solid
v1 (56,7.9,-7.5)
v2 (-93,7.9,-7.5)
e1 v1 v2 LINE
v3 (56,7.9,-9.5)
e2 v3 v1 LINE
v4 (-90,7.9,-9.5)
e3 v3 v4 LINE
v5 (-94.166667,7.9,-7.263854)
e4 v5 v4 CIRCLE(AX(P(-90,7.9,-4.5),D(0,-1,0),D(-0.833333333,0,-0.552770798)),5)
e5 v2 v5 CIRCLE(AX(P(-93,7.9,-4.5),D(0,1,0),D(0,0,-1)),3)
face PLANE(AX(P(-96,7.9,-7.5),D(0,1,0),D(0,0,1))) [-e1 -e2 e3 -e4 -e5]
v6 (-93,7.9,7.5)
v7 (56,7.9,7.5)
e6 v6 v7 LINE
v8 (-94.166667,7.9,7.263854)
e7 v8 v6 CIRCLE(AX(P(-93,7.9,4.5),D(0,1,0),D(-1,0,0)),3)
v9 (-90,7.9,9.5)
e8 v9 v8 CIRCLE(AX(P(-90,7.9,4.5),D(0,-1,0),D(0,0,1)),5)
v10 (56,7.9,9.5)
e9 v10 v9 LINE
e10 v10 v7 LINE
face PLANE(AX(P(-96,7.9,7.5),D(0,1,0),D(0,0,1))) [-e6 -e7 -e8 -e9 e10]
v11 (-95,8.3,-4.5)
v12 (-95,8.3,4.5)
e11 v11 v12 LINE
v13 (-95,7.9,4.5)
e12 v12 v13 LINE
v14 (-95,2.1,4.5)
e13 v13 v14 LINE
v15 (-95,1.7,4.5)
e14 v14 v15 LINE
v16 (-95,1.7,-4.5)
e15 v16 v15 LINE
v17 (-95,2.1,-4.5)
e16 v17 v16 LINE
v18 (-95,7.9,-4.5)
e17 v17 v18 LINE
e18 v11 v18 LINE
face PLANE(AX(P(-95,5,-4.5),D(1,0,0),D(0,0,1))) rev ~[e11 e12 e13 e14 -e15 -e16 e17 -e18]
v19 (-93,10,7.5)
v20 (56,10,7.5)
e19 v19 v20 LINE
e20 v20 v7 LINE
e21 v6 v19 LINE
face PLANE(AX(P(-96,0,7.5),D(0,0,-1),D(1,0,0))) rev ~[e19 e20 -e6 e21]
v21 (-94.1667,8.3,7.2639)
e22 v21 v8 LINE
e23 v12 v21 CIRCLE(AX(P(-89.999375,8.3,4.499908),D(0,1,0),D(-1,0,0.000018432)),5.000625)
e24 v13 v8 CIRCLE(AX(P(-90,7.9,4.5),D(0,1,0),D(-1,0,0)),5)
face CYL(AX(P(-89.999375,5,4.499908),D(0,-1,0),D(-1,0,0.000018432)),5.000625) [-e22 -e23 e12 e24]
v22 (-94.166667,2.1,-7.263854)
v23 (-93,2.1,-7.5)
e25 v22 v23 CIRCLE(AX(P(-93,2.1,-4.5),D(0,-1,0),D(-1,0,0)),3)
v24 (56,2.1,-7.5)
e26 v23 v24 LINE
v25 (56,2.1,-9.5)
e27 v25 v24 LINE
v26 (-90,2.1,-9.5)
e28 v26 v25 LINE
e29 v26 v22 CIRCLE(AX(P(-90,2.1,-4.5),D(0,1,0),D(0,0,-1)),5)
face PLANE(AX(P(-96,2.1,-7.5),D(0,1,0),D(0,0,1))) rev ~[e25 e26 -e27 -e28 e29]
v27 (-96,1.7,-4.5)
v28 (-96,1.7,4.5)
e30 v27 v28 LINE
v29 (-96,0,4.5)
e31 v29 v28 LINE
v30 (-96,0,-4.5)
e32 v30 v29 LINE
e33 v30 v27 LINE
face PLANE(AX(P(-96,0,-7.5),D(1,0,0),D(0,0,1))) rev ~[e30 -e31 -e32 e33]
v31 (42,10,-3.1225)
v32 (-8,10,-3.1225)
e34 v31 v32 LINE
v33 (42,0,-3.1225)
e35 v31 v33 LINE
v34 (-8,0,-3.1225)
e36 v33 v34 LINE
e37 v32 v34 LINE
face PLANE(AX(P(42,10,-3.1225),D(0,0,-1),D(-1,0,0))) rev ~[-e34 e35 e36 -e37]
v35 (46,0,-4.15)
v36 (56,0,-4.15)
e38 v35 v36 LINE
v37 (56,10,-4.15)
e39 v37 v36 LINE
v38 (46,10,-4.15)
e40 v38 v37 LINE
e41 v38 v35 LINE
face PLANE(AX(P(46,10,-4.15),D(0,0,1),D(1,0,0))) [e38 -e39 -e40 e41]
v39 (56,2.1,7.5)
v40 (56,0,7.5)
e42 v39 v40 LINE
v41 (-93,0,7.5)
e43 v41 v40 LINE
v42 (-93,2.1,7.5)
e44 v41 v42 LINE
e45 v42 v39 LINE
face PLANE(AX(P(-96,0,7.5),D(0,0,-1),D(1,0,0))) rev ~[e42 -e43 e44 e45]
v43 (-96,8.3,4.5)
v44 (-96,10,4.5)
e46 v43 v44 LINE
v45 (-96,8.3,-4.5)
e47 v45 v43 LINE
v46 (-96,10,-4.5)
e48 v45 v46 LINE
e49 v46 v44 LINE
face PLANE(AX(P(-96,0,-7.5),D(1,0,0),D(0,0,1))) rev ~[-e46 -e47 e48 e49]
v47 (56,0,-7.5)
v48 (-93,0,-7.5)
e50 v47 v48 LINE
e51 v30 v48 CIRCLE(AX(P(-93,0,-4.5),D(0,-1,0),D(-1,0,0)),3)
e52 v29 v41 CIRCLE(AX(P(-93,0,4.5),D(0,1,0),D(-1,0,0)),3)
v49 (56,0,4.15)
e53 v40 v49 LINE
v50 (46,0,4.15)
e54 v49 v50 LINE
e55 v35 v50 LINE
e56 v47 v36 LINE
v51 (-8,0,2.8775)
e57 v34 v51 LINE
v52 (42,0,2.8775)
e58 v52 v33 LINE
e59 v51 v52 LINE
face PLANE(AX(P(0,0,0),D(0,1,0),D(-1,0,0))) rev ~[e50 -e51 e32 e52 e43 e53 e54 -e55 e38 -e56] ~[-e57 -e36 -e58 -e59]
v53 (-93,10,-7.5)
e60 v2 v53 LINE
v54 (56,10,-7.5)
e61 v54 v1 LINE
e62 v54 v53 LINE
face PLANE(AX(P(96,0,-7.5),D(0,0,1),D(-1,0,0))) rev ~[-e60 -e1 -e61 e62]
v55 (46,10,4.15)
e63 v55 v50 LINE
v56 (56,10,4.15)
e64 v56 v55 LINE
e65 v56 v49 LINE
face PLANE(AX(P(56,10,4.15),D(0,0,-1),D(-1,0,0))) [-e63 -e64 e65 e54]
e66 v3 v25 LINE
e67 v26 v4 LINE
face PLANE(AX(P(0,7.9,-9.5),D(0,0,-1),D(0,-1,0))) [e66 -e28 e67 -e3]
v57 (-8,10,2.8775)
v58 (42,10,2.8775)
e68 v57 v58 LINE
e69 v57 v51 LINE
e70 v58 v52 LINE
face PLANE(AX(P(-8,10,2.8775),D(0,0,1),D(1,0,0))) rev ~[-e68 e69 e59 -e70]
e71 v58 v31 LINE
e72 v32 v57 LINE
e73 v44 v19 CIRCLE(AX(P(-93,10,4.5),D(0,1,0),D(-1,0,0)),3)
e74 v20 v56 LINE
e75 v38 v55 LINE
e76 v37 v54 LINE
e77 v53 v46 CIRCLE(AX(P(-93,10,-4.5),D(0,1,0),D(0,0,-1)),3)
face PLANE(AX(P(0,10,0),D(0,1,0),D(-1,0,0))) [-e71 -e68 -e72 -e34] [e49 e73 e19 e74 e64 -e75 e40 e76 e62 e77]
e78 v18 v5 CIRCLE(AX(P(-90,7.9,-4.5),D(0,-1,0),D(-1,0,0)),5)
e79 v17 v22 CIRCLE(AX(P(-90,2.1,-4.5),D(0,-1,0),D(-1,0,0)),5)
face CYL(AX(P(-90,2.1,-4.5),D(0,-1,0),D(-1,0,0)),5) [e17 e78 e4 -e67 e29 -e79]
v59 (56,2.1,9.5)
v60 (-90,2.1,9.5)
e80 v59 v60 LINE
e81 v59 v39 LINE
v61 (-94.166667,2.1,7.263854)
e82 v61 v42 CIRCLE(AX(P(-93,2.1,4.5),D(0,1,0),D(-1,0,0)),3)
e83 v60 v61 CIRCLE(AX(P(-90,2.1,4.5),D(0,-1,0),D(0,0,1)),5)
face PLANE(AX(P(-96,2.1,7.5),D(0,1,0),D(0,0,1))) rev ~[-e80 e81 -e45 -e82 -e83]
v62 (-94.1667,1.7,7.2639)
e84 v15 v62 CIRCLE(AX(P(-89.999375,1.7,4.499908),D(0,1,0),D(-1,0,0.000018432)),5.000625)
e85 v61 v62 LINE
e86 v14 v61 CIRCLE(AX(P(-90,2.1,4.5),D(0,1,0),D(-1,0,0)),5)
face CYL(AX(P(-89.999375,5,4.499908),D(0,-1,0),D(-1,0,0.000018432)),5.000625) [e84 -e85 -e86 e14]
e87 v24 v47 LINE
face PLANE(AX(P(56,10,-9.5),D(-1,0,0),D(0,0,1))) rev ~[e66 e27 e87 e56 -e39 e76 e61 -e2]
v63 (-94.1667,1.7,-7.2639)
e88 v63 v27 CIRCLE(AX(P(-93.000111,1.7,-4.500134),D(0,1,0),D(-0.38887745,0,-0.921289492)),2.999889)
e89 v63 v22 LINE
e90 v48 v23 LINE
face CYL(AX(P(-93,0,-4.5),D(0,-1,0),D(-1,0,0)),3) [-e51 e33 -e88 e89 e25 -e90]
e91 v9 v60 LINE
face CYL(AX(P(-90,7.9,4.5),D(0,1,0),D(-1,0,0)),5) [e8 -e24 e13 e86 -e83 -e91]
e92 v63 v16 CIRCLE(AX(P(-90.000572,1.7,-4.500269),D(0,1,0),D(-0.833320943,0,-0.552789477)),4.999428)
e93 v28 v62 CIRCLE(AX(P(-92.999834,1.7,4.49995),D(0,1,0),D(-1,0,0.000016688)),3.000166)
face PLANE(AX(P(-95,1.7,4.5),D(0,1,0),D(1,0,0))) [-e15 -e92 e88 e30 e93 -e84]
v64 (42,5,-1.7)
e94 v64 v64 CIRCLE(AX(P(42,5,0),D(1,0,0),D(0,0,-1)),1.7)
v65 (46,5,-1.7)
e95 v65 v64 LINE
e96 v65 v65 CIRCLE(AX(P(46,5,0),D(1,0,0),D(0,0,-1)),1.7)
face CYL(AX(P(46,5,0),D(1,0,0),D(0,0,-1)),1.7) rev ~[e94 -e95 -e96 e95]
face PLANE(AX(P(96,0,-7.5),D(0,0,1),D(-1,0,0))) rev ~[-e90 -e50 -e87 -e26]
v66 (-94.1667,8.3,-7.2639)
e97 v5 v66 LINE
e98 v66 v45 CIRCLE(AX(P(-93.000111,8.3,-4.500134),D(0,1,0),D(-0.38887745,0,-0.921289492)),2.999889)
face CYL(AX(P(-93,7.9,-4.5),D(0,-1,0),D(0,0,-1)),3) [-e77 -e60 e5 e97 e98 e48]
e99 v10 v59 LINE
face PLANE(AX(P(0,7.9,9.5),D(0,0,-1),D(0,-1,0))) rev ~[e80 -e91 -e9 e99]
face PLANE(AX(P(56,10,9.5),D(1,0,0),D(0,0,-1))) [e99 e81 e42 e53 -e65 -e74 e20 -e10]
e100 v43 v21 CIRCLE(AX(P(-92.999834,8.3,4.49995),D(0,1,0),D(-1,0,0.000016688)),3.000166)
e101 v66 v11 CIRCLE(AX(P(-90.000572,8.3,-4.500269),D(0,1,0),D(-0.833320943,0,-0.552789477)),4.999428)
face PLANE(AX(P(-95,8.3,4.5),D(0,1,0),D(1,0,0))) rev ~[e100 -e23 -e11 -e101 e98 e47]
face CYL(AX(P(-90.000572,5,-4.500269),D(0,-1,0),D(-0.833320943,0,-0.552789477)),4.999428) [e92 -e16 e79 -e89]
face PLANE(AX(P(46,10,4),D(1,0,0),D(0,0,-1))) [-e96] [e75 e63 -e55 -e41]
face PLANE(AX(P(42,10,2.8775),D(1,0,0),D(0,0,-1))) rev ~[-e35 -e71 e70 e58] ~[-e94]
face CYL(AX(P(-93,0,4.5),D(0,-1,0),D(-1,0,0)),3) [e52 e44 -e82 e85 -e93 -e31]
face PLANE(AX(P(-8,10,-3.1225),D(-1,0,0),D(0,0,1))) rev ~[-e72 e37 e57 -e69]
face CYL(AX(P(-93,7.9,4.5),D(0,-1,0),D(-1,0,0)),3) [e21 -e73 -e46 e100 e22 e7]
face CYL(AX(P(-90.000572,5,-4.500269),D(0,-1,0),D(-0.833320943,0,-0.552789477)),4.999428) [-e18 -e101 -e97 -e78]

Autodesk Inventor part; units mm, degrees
ref_plane "YZ Plane" through (0, 0, 0) normal (1, 0, 0) x (0, 1, 0)
ref_plane "XZ Plane" through (0, 0, 0) normal (0, 1, 0) x (-1, 0, 0)
sketch "Boceto1" plane through (0, 0, 0) normal (0, 1, 0) x (-1, 0, 0)
  line L0 (96, 7.5) -> (-96, 7.5)
  line L1 (-96, 7.5) -> (-96, -7.5)
  line L2 (-96, -7.5) -> (96, -7.5)
  line L3 (96, -7.5) -> (96, 7.5)
  line L4 (96, 7.5) -> (-96, -7.5) construction
  line L5 (-96, 7.5) -> (96, -7.5) construction
  point P0 (0, 0)
  dimension "d0" = 192
  dimension "d1" = 15
extrude "Extrusión1" add sketch "Boceto1" along normal blind 10
sketch "Boceto2" plane through (0, 0, 0) normal (1, 0, 0) x (0, 1, 0)
  line L0 (0, 7.5) -> (10, 7.5) projected
  line L1 (2.1, 7.5) -> (7.9, 7.5)
  line L2 (7.9, 7.5) -> (7.9, 9.5)
  line L3 (7.9, 9.5) -> (2.1, 9.5)
  line L4 (2.1, 9.5) -> (2.1, 7.5)
  line L5 (0, -7.5) -> (0, 7.5) projected
  line L6 (0, -7.5) -> (10, -7.5) projected
  line L7 (2.1, -7.5) -> (7.9, -7.5)
  line L8 (7.9, -7.5) -> (7.9, -9.5)
  line L9 (7.9, -9.5) -> (2.1, -9.5)
  line L10 (2.1, -9.5) -> (2.1, -7.5)
  point P0 (0, 0)
  point P1 (7.9, -7.5)
  dimension "d4" = 5.8
  dimension "d5" = 2.1
  dimension "d6" = 2
extrude "Extrusión2" add sketch "Boceto2" along normal mid plane 192
sketch "Boceto4" plane through (-96, 0, -7.5) normal (-1, 0, 0) x (0, 0, 1)
  line L0 (15, 2.1) -> (17, 2.1) projected
  line L1 (0, 7.9) -> (-2, 7.9) projected
  line L2 (17, 2.1) -> (-2, 2.1)
  line L3 (-2, 2.1) -> (-2, 7.9)
  line L4 (-2, 7.9) -> (17, 7.9)
  line L5 (17, 7.9) -> (17, 2.1)
  point P0 (7.5, 0)
extrude "Extrusión3" cut sketch "Boceto4" against normal blind 1
sketch "Boceto5" plane through (96, 0, 7.5) normal (1, 0, 0) x (0, 0, -1)
  line L0 (0, 7.9) -> (-2, 7.9) projected
  line L1 (17, 2.1) -> (17, 7.9) projected
  line L2 (-2, 7.9) -> (17, 7.9)
  line L3 (17, 7.9) -> (17, 2.1)
  line L4 (17, 2.1) -> (-2, 2.1)
  line L5 (-2, 2.1) -> (-2, 7.9)
  point P0 (7.5, 0)
extrude "Extrusión4" cut sketch "Boceto5" against normal blind 1
fillet "Empalme1" radius 5 4 edges at (95, 5, -9.5) (95, 5, 9.5) (-95, 5, -9.5) (-95, 5, 9.5)
fillet "Empalme2" radius 3 8 edges at (96, 8.95, 7.5) (96, 1.05, 7.5) (96, 8.95, -7.5) (96, 1.05, -7.5) (-96, 1.05, 7.5) (-96, 8.95, 7.5) (-96, 1.05, -7.5) (-96, 8.95, -7.5)
sketch "Boceto7" plane through (0, 10, 0) normal (0, 1, 0) x (1, 0, 0)
  line L0 (-90, 9.5) -> (90, 9.5) projected
  line L1 (-90, -9.5) -> (90, -9.5) projected
  line L2 (82.6935, 4) -> (-107.9962, 4)
  line L3 (-107.9962, 4) -> (-107.9962, -4)
  line L4 (-107.9962, -4) -> (82.6935, -4)
  line L5 (82.6935, -4) -> (82.6935, 4)
  line L6 (93, 7.5) -> (-93, 7.5) projected
  line L7 (96, 9.5) -> (66, 9.5)
  line L8 (66, 9.5) -> (66, -22.8831)
  line L9 (66, -22.8831) -> (96, -22.8831)
  line L10 (96, -22.8831) -> (96, 9.5)
  line L11 (96, -4.5) -> (96, 4.5) projected
  line L12 (66, 9.5) -> (56, 9.5)
  line L13 (56, 9.5) -> (56, 4)
  line L14 (56, 4) -> (66, 4)
  line L15 (66, 4) -> (66, 9.5)
  line L16 (66, -9.5) -> (56, -9.5)
  line L17 (56, -9.5) -> (56, -4)
  line L18 (56, -4) -> (66, -4)
  line L19 (66, -4) -> (66, -9.5)
  line L20 (66, 4) -> (46, 4)
  line L21 (46, 4) -> (46, -4)
  line L22 (46, -4) -> (66, -4)
  line L23 (66, -4) -> (66, 4)
  point P0 (90, 9.5)
  point P1 (66, 4)
  point P2 (66, -4)
  dimension "d17" = 8
  dimension "d18" = 3.5
  dimension "d19" = 30
  dimension "d20" = 10
  dimension "d23" = 10
extrude "Extrusión5" cut sketch "Boceto7" against normal through all contours L0 L8 L6 L13 | L0 L7 L10 L9 L8 L4 L5 L2 | L6 L8 L2 L13 | L2 L8 L4 L21 | L2 L5 L4 L8 | L8 L1 L17 L4
sketch "Boceto8" plane through (0, 10, 0) normal (0, 1, 0) x (1, 0, 0)
  line L0 (56, -0.8) -> (56, -7.5)
  line L1 (46, 4.15) -> (56, 4.15)
  line L2 (56, 4.15) -> (56, -4.15)
  line L3 (56, -4.15) -> (46, -4.15)
  line L4 (46, -4.15) -> (46, 4.15)
  line L5 (46, -4) -> (46, 4) projected
  line L6 (46, 4) -> (56, 4) projected
  line L7 (56, -4) -> (46, -4) projected
  point P0 (0, 0)
  dimension "d24" = 0.15
  dimension "d25" = 0.15
extrude "Extrusión6" cut sketch "Boceto8" against normal through all
sketch "Boceto10" plane through (46, 10, 4.15) normal (1, 0, 0) x (0, 0, -1)
  circle A0 centre (4.15, -5) radius 1.7
  line L0 (8.3, -10) -> (0, -10) projected
  point P0 (4.15, -10)
  point P1 (4.15, -10)
  dimension "d35" = 3.4
  dimension "d36" = 5
extrude "Extrusión8" cut sketch "Boceto10" against normal blind 7.5
sketch "Boceto11" plane through (0, 10, 0) normal (0, 1, 0) x (1, 0, 0)
  line L0 (-8, -2.8775) -> (42, -2.8775)
  line L1 (42, -2.8775) -> (42, 3.1225)
  line L2 (42, 3.1225) -> (-8, 3.1225)
  line L3 (-8, 3.1225) -> (-8, -2.8775)
  line L4 (46, -4.15) -> (46, 4.15) projected
  point P0 (0, 0)
  dimension "d39" = 6
  dimension "d40" = 50
  dimension "d41" = 4
extrude "Extrusión9" cut sketch "Boceto11" against normal through all
ref_plane "Plano de trabajo1" through (-95, 5, 4.5) normal (0, 1, 0) x (1, 0, 0)
sketch "Boceto12" plane through (-95, 5, 4.5) normal (0, 1, 0) x (1, 0, 0)
  arc A0 (0.8333, 11.7639) -> (-1, 9) centre (2, 9) ccw projected
  arc A1 (0.8333, 11.7639) -> (0, 9) centre (5, 9) ccw projected
  line L0 (0, 9) -> (0, 0) projected
  arc A2 (0, 0) -> (0.8333, -2.7639) centre (5, 0) ccw projected
  arc A3 (-1, 0) -> (0.8333, -2.7639) centre (2, 0) ccw projected
  line L1 (-1, 9) -> (-1, 0) projected
  point P0 (95, 4.5)
extrude "Extrusión10" cut sketch "Boceto12" along normal mid plane 6.6
sketch "Boceto9" plane through (0, 10, 0) normal (0, 1, 0) x (1, 0, 0)
  line L0 (38.5, 3) -> (42, 3)
  line L1 (42, 3) -> (42, -3)
  line L2 (42, -3) -> (38.5, -3)
  line L3 (38.5, -3) -> (38.5, 3)
  line L4 (38.5, 3) -> (42, -3) construction
  line L5 (42, 3) -> (38.5, -3) construction
  line L6 (46, -4.15) -> (46, 4.15) projected
  line L7 (42, 1.75) -> (46, 1.75)
  line L8 (46, 1.75) -> (46, -1.75)
  line L9 (46, -1.75) -> (42, -1.75)
  line L10 (42, -1.75) -> (42, 1.75)
  point P0 (0, 0)
  point P1 (40.25, 0)
  dimension "d28" = 6
  dimension "d29" = 3.5
  dimension "d30" = 1.75
  dimension "d31" = 3.5
  dimension "d32" = 4
properties part number "GT2RackA" material "UHMW, negro"
